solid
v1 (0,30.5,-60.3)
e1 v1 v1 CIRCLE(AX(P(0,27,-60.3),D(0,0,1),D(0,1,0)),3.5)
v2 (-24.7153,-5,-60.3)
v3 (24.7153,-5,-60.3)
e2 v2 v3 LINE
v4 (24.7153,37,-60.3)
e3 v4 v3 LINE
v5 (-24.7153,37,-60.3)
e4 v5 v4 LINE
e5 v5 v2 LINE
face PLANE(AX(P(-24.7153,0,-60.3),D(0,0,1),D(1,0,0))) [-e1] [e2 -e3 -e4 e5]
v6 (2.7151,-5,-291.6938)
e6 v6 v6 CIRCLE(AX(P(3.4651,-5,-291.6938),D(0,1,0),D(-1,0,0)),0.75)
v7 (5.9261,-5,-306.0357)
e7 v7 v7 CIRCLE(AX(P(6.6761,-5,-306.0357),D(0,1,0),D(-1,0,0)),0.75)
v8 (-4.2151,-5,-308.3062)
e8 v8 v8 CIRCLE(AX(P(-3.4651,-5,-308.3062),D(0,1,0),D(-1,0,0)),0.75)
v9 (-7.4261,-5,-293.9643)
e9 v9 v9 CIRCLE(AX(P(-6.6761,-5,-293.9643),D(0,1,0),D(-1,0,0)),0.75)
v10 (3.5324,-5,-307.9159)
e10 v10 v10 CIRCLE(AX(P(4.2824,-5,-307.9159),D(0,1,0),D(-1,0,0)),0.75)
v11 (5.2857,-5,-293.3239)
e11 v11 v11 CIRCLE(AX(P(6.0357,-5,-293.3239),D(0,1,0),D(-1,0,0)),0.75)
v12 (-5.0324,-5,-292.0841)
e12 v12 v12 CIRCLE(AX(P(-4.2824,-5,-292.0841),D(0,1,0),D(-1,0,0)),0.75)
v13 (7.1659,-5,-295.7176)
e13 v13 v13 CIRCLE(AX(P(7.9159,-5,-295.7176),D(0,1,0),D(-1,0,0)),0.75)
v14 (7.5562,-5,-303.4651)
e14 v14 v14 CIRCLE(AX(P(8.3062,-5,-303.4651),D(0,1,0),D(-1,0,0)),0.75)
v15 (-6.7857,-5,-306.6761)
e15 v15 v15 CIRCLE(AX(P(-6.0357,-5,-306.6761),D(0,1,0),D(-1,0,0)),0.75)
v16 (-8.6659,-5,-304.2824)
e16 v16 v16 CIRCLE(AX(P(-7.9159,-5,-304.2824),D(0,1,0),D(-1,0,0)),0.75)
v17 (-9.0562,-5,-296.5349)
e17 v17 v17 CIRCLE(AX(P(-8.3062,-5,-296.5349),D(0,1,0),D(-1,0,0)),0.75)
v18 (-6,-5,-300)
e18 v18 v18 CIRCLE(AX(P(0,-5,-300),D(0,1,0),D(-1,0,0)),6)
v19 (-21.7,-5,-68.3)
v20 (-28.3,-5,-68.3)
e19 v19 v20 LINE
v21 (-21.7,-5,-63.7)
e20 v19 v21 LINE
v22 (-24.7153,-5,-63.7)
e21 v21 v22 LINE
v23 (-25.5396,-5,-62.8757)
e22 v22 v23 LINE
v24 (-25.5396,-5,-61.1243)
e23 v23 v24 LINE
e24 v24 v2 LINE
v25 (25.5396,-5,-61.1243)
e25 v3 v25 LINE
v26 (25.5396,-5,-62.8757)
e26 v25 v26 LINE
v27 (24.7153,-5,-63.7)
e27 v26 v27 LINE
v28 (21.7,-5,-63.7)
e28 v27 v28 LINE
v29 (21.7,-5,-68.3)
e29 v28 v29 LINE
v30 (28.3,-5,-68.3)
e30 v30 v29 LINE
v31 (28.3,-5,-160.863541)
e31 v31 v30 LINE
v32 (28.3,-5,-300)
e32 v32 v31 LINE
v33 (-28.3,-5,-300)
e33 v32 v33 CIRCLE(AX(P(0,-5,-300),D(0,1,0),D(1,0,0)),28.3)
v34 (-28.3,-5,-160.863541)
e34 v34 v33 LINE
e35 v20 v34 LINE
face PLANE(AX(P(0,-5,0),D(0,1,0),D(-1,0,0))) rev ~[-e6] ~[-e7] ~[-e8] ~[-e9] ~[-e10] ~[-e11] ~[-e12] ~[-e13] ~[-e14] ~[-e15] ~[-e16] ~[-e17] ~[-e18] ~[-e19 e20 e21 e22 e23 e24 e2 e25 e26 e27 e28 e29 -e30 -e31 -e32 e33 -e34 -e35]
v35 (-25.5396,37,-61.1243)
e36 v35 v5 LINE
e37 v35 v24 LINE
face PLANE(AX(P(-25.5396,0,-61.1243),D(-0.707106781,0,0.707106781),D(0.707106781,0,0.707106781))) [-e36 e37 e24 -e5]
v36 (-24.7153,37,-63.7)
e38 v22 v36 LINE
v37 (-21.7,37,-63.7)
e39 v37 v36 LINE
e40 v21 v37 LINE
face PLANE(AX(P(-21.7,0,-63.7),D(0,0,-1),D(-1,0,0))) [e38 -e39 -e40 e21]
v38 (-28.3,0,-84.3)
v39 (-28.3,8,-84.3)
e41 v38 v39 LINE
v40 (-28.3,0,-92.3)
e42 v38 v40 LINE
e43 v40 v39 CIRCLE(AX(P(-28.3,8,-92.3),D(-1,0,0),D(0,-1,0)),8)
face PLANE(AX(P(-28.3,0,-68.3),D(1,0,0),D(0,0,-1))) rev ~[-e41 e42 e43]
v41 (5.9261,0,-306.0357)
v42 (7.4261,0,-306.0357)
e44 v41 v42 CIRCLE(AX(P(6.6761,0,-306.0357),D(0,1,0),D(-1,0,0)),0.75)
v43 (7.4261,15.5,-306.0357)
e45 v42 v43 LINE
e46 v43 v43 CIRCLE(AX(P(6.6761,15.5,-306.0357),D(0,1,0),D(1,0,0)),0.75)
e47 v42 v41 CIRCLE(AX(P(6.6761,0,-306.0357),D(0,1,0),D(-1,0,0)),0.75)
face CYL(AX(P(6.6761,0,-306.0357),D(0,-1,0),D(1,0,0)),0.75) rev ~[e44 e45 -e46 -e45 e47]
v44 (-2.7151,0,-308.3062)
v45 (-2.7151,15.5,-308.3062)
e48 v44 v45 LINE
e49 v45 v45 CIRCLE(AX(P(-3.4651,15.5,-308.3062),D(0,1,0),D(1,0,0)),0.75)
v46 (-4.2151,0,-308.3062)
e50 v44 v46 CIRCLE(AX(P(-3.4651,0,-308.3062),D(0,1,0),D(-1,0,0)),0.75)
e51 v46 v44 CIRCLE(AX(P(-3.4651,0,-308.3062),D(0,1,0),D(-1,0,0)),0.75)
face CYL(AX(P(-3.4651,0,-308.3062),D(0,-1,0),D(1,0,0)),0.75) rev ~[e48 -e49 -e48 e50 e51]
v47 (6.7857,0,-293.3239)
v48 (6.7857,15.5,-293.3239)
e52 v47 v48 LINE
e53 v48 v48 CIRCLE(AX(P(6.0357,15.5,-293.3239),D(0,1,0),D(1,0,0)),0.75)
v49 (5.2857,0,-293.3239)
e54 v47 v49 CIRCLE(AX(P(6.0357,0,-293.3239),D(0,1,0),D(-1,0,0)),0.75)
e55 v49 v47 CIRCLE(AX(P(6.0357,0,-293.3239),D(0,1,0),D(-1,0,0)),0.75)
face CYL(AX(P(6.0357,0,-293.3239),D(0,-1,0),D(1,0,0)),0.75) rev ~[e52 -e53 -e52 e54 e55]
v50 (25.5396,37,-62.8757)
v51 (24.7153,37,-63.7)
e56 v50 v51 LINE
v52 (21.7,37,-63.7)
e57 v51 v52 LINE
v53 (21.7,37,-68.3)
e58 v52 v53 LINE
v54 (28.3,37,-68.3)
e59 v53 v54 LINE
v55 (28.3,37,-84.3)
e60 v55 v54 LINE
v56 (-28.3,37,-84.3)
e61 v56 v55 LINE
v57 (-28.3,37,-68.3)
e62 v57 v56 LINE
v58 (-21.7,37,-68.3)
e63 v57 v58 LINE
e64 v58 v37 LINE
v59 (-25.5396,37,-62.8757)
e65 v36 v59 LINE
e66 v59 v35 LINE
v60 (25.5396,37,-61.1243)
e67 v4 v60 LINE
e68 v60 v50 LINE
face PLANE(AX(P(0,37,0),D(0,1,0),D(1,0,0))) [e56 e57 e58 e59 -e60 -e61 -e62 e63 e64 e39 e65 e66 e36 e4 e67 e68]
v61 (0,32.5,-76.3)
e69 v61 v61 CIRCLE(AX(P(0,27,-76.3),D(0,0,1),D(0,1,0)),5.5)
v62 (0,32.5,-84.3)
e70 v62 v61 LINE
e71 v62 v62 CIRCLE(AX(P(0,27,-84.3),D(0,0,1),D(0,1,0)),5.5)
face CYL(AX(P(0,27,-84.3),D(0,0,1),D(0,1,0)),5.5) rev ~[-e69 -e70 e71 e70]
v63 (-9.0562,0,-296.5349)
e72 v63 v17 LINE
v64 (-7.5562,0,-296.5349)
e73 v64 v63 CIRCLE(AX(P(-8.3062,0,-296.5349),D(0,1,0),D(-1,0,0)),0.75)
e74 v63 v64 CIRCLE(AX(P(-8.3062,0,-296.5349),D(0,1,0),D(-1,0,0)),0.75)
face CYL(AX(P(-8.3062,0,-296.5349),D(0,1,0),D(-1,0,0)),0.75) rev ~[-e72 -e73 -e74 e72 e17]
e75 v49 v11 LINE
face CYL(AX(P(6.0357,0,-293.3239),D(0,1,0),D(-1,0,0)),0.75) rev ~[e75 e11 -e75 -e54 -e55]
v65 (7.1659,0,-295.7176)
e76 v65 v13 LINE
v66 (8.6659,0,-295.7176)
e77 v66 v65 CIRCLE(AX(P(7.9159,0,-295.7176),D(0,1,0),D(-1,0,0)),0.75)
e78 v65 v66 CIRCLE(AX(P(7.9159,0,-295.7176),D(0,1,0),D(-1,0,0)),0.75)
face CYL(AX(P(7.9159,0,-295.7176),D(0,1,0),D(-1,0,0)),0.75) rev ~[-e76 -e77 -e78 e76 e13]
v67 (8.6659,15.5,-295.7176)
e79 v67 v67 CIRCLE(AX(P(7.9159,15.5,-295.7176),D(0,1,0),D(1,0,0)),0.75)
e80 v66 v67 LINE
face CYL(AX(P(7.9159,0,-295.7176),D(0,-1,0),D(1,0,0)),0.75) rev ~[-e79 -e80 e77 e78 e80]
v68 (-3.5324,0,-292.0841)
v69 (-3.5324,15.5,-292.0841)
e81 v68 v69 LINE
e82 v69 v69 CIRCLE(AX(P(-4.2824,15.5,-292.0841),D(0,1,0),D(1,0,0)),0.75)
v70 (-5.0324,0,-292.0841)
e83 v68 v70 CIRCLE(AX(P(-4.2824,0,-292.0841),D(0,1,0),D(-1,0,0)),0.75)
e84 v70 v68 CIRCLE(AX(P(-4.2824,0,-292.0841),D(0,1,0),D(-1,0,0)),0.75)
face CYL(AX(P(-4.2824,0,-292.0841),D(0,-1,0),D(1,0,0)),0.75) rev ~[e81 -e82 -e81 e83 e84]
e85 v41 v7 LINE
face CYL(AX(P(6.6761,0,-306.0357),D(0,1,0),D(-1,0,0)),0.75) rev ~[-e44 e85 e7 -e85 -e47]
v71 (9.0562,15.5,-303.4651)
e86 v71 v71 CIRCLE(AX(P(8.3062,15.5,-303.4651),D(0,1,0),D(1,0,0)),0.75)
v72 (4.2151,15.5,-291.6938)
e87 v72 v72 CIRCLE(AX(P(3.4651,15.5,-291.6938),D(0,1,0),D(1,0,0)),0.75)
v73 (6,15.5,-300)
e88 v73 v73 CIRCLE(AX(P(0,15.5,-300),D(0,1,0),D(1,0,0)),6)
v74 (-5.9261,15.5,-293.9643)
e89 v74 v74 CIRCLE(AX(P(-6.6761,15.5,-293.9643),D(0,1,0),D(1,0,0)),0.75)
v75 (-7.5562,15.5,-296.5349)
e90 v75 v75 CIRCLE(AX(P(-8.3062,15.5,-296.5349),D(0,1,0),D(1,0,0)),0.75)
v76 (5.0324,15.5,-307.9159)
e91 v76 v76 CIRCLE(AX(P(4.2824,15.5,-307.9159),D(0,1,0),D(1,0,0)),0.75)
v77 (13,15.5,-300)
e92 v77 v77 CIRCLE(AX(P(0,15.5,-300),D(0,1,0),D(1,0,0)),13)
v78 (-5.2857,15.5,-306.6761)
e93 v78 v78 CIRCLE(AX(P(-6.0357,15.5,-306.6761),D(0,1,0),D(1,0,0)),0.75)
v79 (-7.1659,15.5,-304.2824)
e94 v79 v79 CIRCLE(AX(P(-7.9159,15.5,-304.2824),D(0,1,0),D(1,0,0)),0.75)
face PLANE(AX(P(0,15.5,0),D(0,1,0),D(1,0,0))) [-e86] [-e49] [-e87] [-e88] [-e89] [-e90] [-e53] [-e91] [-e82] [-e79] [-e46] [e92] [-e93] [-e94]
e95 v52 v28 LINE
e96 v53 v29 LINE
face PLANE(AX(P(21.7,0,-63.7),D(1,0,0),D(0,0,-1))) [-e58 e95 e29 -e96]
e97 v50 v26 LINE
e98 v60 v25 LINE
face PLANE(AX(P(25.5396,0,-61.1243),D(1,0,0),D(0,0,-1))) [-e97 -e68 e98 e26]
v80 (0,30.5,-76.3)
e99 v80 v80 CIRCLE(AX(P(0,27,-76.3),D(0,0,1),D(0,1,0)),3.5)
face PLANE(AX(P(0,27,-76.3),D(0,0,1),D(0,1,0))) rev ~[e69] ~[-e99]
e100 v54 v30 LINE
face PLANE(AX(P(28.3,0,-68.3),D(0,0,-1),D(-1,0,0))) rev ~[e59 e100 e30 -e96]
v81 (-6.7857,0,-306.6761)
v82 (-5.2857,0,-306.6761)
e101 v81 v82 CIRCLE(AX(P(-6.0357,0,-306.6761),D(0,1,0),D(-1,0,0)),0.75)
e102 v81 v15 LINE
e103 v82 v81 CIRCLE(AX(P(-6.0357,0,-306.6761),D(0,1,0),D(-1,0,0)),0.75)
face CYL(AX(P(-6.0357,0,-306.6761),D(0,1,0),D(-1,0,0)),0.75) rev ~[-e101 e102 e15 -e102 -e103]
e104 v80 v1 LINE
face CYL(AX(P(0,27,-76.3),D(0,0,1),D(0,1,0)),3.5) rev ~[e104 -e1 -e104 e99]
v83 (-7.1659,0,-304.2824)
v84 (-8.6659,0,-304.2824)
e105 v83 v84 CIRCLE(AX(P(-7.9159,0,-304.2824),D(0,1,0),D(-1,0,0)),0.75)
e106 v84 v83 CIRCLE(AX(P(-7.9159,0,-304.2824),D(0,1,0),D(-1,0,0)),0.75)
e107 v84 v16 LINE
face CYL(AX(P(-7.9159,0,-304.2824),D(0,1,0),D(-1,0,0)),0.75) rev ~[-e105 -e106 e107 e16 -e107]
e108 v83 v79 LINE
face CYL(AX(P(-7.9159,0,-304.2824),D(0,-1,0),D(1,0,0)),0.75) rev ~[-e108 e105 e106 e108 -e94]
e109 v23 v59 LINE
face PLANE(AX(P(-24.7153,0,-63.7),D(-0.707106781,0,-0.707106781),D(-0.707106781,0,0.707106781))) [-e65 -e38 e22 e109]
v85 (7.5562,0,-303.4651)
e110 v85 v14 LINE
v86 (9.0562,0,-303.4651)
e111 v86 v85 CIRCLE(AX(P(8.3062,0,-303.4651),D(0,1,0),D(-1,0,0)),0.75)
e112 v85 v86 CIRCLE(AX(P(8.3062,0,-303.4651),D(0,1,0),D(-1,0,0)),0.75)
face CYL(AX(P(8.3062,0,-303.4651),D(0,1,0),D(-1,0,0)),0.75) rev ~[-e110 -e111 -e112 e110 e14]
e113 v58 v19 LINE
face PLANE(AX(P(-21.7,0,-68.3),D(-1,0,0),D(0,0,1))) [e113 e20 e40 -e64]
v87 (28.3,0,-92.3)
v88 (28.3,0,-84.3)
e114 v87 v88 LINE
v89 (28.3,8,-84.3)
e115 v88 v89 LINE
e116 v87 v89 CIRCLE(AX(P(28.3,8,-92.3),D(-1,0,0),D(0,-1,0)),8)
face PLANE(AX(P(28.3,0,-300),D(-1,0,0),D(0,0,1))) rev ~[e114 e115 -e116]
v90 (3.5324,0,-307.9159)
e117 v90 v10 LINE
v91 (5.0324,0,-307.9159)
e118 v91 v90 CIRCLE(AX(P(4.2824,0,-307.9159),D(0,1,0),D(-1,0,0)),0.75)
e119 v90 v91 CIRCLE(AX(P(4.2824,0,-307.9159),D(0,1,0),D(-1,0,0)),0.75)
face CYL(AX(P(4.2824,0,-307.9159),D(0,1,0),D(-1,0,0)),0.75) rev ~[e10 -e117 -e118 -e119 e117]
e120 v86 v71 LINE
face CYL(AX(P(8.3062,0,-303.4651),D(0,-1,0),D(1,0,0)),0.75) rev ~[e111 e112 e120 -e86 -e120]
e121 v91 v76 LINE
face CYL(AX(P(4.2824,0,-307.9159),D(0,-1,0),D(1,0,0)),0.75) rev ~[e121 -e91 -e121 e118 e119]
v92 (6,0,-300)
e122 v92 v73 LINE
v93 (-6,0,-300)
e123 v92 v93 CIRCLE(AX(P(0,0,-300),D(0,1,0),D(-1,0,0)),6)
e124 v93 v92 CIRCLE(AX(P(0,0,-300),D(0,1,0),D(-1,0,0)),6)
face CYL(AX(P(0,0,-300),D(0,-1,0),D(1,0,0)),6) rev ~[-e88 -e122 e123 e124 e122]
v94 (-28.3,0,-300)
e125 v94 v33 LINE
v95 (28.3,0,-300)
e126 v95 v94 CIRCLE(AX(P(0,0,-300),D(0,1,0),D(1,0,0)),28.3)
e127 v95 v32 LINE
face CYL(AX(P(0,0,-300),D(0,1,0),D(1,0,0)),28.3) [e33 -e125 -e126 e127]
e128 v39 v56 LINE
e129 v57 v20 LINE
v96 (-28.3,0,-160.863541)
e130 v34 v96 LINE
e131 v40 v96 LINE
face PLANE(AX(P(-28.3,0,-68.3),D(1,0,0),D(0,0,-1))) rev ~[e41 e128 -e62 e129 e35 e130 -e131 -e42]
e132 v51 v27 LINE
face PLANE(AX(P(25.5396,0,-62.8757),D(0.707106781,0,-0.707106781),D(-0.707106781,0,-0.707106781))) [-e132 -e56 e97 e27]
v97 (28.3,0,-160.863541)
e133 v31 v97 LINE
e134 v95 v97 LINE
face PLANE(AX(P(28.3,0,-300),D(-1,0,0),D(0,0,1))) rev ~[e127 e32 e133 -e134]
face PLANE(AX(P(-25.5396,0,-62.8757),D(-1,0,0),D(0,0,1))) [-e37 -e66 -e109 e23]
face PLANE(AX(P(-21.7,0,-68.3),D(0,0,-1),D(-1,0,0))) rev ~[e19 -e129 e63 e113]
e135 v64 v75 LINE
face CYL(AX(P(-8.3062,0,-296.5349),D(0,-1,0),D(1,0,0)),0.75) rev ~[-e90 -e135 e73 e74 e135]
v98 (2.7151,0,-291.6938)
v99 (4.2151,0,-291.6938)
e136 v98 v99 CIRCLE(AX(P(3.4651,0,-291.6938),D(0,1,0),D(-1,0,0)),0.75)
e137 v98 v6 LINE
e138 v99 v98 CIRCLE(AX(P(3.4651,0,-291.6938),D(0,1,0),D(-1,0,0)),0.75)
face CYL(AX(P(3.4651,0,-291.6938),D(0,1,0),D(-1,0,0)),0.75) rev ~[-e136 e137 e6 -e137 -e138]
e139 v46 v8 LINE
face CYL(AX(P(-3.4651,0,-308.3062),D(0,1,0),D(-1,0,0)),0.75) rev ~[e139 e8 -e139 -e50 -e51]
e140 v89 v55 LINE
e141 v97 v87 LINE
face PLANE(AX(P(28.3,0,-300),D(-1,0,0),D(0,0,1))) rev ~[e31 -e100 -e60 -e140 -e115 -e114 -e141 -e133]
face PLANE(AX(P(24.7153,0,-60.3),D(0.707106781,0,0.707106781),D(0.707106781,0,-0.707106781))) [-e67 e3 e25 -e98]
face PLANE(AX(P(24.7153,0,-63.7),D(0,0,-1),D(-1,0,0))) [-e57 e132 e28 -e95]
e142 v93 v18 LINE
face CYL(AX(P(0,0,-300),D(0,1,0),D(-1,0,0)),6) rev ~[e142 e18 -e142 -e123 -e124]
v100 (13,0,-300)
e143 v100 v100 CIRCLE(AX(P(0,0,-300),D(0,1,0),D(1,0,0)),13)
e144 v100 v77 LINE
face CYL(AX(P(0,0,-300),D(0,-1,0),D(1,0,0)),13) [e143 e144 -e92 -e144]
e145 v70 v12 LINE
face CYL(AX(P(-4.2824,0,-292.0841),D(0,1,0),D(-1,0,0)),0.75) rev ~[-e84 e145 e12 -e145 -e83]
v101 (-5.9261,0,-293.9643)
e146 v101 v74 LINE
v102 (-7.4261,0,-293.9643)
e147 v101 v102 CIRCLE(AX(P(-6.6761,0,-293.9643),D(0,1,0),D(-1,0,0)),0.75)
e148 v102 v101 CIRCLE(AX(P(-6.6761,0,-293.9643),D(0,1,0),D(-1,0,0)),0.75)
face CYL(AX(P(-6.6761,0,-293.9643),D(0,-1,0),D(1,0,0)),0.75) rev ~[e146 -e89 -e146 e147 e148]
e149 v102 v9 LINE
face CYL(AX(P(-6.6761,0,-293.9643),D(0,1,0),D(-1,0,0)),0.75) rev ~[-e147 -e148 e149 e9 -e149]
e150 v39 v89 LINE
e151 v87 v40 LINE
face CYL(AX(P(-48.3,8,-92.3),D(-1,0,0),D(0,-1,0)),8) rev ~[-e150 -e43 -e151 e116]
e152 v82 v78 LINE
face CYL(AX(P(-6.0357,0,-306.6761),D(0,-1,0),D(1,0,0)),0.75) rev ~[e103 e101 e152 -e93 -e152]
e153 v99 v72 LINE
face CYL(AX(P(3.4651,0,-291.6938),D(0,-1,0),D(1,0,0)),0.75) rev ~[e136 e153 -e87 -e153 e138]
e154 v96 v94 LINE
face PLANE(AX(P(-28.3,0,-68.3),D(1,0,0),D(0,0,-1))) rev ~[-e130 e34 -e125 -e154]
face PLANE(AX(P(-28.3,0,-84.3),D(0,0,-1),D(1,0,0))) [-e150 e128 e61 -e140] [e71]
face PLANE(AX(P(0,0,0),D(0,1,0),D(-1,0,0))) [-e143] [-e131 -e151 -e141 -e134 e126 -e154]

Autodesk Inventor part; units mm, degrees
ref_plane "YZ Plane" through (0, 0, 0) normal (1, 0, 0) x (0, 1, 0)
ref_plane "XZ Plane" through (0, 0, 0) normal (0, 1, 0) x (-1, 0, 0)
ref_plane "XY Plane" through (0, 0, 0) normal (0, 0, 1) x (1, 0, 0)
sketch "Sketch1" plane through (0, 0, 0) normal (0, 1, 0) x (-1, 0, 0)
  circle A0 centre (14, -52) radius 5.5 construction
  circle A1 centre (-14, -52) radius 5.5 construction
  circle A2 centre (-4.2824, 7.9159) radius 0.75 construction
  circle A3 centre (3.4651, 8.3062) radius 0.75 construction
  circle A4 centre (6.0357, 6.6761) radius 0.75 construction
  circle A5 centre (7.9159, 4.2824) radius 0.75 construction
  circle A6 centre (8.3062, -3.4651) radius 0.75 construction
  circle A7 centre (6.6761, -6.0357) radius 0.75 construction
  circle A8 centre (4.2824, -7.9159) radius 0.75 construction
  circle A9 centre (-3.4651, -8.3062) radius 0.75 construction
  circle A10 centre (-6.0357, -6.6761) radius 0.75 construction
  circle A11 centre (-7.9159, -4.2824) radius 0.75 construction
  circle A12 centre (-6.6761, 6.0357) radius 0.75 construction
  circle A13 centre (-8.3062, 3.4651) radius 0.75 construction
  circle A14 centre (0, 0) radius 6 construction
  line L0 (28, -68) -> (28, 0) construction
  arc A15 (28, 0) -> (-28, 0) centre (0, 0) ccw construction
  line L1 (-28, 0) -> (-28, -68) construction
  line L2 (-28, -68) -> (-22, -68) construction
  line L3 (-22, -68) -> (-22, -64) construction
  line L4 (-22, -64) -> (-24.8396, -64) construction
  line L5 (-24.8396, -64) -> (-25.8396, -63) construction
  line L6 (-25.8396, -63) -> (-25.8396, -61) construction
  line L7 (-25.8396, -61) -> (-24.8396, -60) construction
  line L8 (-24.8396, -60) -> (24.8396, -60) construction
  line L9 (24.8396, -60) -> (25.8396, -61) construction
  line L10 (25.8396, -61) -> (25.8396, -63) construction
  line L11 (25.8396, -63) -> (24.8396, -64) construction
  line L12 (24.8396, -64) -> (22, -64) construction
  line L13 (22, -64) -> (22, -68) construction
  line L14 (22, -68) -> (28, -68) construction
  line L15 (0, 0) -> (0, -300) construction
  line L16 (-28.3, 0) -> (-28.3, -300) construction
  line L17 (28.3, -300) -> (28.3, 0) construction
  arc A16 (28.3, 0) -> (-28.3, 0) centre (0, 0) ccw construction
  arc A17 (-28.3, -300) -> (28.3, -300) centre (0, -300) ccw construction
  line L18 (21.7, -63.7) -> (24.7153, -63.7)
  line L19 (24.7153, -63.7) -> (25.5396, -62.8757)
  line L20 (25.5396, -62.8757) -> (25.5396, -61.1243)
  line L21 (25.5396, -61.1243) -> (24.7153, -60.3)
  line L22 (24.7153, -60.3) -> (-24.7153, -60.3)
  line L23 (-24.7153, -60.3) -> (-25.5396, -61.1243)
  line L24 (-25.5396, -61.1243) -> (-25.5396, -62.8757)
  line L25 (-25.5396, -62.8757) -> (-24.7153, -63.7)
  line L26 (-24.7153, -63.7) -> (-21.7, -63.7)
  line L27 (-21.7, -63.7) -> (-21.7, -68.3)
  line L28 (-21.7, -68.3) -> (-28.3, -68.3) construction
  line L29 (-28.3, -68.3) -> (-28.3, 0) construction
  arc A18 (28.3, 0) -> (-28.3, 0) centre (0, 0) ccw construction
  line L30 (28.3, 0) -> (28.3, -68.3) construction
  line L31 (28.3, -68.3) -> (21.7, -68.3) construction
  line L32 (21.7, -68.3) -> (21.7, -63.7)
  arc A19 (-28.3, -300) -> (28.3, -300) centre (0, -300) ccw
  line L33 (0, -150) -> (28.3, -150) construction
  circle A20 centre (-4.2824, -307.9159) radius 0.75
  circle A21 centre (3.4651, -308.3062) radius 0.75
  circle A22 centre (6.0357, -306.6761) radius 0.75
  circle A23 centre (7.9159, -304.2824) radius 0.75
  circle A24 centre (8.3062, -296.5349) radius 0.75
  circle A25 centre (6.6761, -293.9643) radius 0.75
  circle A26 centre (4.2824, -292.0841) radius 0.75
  circle A27 centre (-3.4651, -291.6938) radius 0.75
  circle A28 centre (-6.0357, -293.3239) radius 0.75
  circle A29 centre (-7.9159, -295.7176) radius 0.75
  circle A30 centre (-6.6761, -306.0357) radius 0.75
  circle A31 centre (-8.3062, -303.4651) radius 0.75
  circle A32 centre (0, -300) radius 6
  line L34 (-28.3, -300) -> (-28.3, -68.3)
  line L35 (-28.3, -68.3) -> (-21.7, -68.3)
  line L36 (21.7, -68.3) -> (28.3, -68.3)
  line L37 (28.3, -68.3) -> (28.3, -300)
  point P0 (0, -150)
  dimension "d0" = 300
  dimension "d1" = 0.3
  dimension "d2" = 150
extrude "Extrusion1" add sketch "Sketch1" against normal blind 5
sketch "Sketch2" plane through (0, 0, 0) normal (0, 1, 0) x (1, 0, 0)
  circle A0 centre (0, 300) radius 6 construction
  circle A1 centre (8.3062, 303.4651) radius 0.75 construction
  circle A2 centre (6.6761, 306.0357) radius 0.75 construction
  circle A3 centre (-7.9159, 304.2824) radius 0.75 construction
  circle A4 centre (-6.0357, 306.6761) radius 0.75 construction
  circle A5 centre (-3.4651, 308.3062) radius 0.75 construction
  circle A6 centre (4.2824, 307.9159) radius 0.75 construction
  circle A7 centre (3.4651, 291.6938) radius 0.75 construction
  circle A8 centre (6.0357, 293.3239) radius 0.75 construction
  circle A9 centre (7.9159, 295.7176) radius 0.75 construction
  circle A10 centre (-8.3062, 296.5349) radius 0.75 construction
  circle A11 centre (-6.6761, 293.9643) radius 0.75 construction
  circle A12 centre (-4.2824, 292.0841) radius 0.75 construction
  arc A13 (28.3, 300) -> (-28.3, 300) centre (0, 300) ccw construction
  line L0 (-28.3, 300) -> (-28.3, 68.3) construction
  line L1 (-28.3, 68.3) -> (-21.7, 68.3) projected
  line L2 (-21.7, 68.3) -> (-21.7, 63.7) projected
  line L3 (-21.7, 63.7) -> (-24.7153, 63.7) projected
  line L4 (-24.7153, 63.7) -> (-25.5396, 62.8757) projected
  line L5 (-25.5396, 62.8757) -> (-25.5396, 61.1243) projected
  line L6 (-25.5396, 61.1243) -> (-24.7153, 60.3) projected
  line L7 (-24.7153, 60.3) -> (24.7153, 60.3) projected
  line L8 (24.7153, 60.3) -> (25.5396, 61.1243) projected
  line L9 (25.5396, 61.1243) -> (25.5396, 62.8757) projected
  line L10 (25.5396, 62.8757) -> (24.7153, 63.7) projected
  line L11 (24.7153, 63.7) -> (21.7, 63.7) projected
  line L12 (21.7, 63.7) -> (21.7, 68.3) projected
  line L13 (21.7, 68.3) -> (28.3, 68.3) projected
  line L14 (28.3, 68.3) -> (28.3, 300) construction
  line L15 (-28.3, 68.3) -> (-28.3, 300) construction
  line L16 (-28.3, 68.3) -> (-28.3, 84.3)
  line L17 (-28.3, 84.3) -> (28.3, 84.3)
  line L18 (28.3, 68.3) -> (28.3, 300) construction
  line L19 (28.3, 84.3) -> (28.3, 68.3)
  point P0 (0, 0)
  dimension "d5" = 16
extrude "Extrusion2" add sketch "Sketch2" along normal blind 37
sketch "Sketch3" plane through (0, 0, 0) normal (0, 1, 0) x (1, 0, 0)
  point P0 (0, 0)
sketch "Sketch4" plane through (0, 0, 0) normal (0, 1, 0) x (1, 0, 0)
  line L0 (-28.3, 84.3) -> (28.3, 84.3) projected
  line L1 (28.3, 84.3) -> (28.3, 300) projected
  arc A0 (28.3, 300) -> (-28.3, 300) centre (0, 300) ccw projected
  line L2 (-28.3, 300) -> (-28.3, 84.3) projected
  circle A1 centre (0, 300) radius 6 projected
  circle A2 centre (8.3062, 303.4651) radius 0.75 projected
  circle A3 centre (6.6761, 306.0357) radius 0.75 projected
  circle A4 centre (-7.9159, 304.2824) radius 0.75 projected
  circle A5 centre (-6.0357, 306.6761) radius 0.75 projected
  circle A6 centre (-3.4651, 308.3062) radius 0.75 projected
  circle A7 centre (4.2824, 307.9159) radius 0.75 projected
  circle A8 centre (3.4651, 291.6938) radius 0.75 projected
  circle A9 centre (6.0357, 293.3239) radius 0.75 projected
  circle A10 centre (7.9159, 295.7176) radius 0.75 projected
  circle A11 centre (-8.3062, 296.5349) radius 0.75 projected
  circle A12 centre (-6.6761, 293.9643) radius 0.75 projected
  circle A13 centre (-4.2824, 292.0841) radius 0.75 projected
  circle A14 centre (0, 300) radius 13
  point P0 (0, 0)
  dimension "d8" = 26
extrude "Extrusion3" add sketch "Sketch4" along normal blind 15.5 contours A14
sketch "Sketch5" plane through (28.3, 0, -84.3) normal (0, 0, -1) x (-1, 0, 0)
  line L0 (56.6, 0) -> (0, 0) construction
  line L1 (56.6, 0) -> (56.6, 37) construction
  line L2 (0, 37) -> (56.6, 37) construction
  line L3 (0, 0) -> (0, 37) construction
  line L4 (0, 37) -> (56.6, 37) construction
  line L5 (28.3, 37) -> (28.3, 0) construction
  point P0 (28.3, 27)
  dimension "d11" = 10
hole "Hole1" at (0, 27, -84.3) direction (0, 0, 1) diameter 7 end through all counterbore diameter 11 counterbore depth 8
fillet "Fillet1" radius 8 1 edges at (0, 0, -84.3)
equation "\"d2\" = 0.5 * d0"
properties part number "arm_segment_1_2b"
